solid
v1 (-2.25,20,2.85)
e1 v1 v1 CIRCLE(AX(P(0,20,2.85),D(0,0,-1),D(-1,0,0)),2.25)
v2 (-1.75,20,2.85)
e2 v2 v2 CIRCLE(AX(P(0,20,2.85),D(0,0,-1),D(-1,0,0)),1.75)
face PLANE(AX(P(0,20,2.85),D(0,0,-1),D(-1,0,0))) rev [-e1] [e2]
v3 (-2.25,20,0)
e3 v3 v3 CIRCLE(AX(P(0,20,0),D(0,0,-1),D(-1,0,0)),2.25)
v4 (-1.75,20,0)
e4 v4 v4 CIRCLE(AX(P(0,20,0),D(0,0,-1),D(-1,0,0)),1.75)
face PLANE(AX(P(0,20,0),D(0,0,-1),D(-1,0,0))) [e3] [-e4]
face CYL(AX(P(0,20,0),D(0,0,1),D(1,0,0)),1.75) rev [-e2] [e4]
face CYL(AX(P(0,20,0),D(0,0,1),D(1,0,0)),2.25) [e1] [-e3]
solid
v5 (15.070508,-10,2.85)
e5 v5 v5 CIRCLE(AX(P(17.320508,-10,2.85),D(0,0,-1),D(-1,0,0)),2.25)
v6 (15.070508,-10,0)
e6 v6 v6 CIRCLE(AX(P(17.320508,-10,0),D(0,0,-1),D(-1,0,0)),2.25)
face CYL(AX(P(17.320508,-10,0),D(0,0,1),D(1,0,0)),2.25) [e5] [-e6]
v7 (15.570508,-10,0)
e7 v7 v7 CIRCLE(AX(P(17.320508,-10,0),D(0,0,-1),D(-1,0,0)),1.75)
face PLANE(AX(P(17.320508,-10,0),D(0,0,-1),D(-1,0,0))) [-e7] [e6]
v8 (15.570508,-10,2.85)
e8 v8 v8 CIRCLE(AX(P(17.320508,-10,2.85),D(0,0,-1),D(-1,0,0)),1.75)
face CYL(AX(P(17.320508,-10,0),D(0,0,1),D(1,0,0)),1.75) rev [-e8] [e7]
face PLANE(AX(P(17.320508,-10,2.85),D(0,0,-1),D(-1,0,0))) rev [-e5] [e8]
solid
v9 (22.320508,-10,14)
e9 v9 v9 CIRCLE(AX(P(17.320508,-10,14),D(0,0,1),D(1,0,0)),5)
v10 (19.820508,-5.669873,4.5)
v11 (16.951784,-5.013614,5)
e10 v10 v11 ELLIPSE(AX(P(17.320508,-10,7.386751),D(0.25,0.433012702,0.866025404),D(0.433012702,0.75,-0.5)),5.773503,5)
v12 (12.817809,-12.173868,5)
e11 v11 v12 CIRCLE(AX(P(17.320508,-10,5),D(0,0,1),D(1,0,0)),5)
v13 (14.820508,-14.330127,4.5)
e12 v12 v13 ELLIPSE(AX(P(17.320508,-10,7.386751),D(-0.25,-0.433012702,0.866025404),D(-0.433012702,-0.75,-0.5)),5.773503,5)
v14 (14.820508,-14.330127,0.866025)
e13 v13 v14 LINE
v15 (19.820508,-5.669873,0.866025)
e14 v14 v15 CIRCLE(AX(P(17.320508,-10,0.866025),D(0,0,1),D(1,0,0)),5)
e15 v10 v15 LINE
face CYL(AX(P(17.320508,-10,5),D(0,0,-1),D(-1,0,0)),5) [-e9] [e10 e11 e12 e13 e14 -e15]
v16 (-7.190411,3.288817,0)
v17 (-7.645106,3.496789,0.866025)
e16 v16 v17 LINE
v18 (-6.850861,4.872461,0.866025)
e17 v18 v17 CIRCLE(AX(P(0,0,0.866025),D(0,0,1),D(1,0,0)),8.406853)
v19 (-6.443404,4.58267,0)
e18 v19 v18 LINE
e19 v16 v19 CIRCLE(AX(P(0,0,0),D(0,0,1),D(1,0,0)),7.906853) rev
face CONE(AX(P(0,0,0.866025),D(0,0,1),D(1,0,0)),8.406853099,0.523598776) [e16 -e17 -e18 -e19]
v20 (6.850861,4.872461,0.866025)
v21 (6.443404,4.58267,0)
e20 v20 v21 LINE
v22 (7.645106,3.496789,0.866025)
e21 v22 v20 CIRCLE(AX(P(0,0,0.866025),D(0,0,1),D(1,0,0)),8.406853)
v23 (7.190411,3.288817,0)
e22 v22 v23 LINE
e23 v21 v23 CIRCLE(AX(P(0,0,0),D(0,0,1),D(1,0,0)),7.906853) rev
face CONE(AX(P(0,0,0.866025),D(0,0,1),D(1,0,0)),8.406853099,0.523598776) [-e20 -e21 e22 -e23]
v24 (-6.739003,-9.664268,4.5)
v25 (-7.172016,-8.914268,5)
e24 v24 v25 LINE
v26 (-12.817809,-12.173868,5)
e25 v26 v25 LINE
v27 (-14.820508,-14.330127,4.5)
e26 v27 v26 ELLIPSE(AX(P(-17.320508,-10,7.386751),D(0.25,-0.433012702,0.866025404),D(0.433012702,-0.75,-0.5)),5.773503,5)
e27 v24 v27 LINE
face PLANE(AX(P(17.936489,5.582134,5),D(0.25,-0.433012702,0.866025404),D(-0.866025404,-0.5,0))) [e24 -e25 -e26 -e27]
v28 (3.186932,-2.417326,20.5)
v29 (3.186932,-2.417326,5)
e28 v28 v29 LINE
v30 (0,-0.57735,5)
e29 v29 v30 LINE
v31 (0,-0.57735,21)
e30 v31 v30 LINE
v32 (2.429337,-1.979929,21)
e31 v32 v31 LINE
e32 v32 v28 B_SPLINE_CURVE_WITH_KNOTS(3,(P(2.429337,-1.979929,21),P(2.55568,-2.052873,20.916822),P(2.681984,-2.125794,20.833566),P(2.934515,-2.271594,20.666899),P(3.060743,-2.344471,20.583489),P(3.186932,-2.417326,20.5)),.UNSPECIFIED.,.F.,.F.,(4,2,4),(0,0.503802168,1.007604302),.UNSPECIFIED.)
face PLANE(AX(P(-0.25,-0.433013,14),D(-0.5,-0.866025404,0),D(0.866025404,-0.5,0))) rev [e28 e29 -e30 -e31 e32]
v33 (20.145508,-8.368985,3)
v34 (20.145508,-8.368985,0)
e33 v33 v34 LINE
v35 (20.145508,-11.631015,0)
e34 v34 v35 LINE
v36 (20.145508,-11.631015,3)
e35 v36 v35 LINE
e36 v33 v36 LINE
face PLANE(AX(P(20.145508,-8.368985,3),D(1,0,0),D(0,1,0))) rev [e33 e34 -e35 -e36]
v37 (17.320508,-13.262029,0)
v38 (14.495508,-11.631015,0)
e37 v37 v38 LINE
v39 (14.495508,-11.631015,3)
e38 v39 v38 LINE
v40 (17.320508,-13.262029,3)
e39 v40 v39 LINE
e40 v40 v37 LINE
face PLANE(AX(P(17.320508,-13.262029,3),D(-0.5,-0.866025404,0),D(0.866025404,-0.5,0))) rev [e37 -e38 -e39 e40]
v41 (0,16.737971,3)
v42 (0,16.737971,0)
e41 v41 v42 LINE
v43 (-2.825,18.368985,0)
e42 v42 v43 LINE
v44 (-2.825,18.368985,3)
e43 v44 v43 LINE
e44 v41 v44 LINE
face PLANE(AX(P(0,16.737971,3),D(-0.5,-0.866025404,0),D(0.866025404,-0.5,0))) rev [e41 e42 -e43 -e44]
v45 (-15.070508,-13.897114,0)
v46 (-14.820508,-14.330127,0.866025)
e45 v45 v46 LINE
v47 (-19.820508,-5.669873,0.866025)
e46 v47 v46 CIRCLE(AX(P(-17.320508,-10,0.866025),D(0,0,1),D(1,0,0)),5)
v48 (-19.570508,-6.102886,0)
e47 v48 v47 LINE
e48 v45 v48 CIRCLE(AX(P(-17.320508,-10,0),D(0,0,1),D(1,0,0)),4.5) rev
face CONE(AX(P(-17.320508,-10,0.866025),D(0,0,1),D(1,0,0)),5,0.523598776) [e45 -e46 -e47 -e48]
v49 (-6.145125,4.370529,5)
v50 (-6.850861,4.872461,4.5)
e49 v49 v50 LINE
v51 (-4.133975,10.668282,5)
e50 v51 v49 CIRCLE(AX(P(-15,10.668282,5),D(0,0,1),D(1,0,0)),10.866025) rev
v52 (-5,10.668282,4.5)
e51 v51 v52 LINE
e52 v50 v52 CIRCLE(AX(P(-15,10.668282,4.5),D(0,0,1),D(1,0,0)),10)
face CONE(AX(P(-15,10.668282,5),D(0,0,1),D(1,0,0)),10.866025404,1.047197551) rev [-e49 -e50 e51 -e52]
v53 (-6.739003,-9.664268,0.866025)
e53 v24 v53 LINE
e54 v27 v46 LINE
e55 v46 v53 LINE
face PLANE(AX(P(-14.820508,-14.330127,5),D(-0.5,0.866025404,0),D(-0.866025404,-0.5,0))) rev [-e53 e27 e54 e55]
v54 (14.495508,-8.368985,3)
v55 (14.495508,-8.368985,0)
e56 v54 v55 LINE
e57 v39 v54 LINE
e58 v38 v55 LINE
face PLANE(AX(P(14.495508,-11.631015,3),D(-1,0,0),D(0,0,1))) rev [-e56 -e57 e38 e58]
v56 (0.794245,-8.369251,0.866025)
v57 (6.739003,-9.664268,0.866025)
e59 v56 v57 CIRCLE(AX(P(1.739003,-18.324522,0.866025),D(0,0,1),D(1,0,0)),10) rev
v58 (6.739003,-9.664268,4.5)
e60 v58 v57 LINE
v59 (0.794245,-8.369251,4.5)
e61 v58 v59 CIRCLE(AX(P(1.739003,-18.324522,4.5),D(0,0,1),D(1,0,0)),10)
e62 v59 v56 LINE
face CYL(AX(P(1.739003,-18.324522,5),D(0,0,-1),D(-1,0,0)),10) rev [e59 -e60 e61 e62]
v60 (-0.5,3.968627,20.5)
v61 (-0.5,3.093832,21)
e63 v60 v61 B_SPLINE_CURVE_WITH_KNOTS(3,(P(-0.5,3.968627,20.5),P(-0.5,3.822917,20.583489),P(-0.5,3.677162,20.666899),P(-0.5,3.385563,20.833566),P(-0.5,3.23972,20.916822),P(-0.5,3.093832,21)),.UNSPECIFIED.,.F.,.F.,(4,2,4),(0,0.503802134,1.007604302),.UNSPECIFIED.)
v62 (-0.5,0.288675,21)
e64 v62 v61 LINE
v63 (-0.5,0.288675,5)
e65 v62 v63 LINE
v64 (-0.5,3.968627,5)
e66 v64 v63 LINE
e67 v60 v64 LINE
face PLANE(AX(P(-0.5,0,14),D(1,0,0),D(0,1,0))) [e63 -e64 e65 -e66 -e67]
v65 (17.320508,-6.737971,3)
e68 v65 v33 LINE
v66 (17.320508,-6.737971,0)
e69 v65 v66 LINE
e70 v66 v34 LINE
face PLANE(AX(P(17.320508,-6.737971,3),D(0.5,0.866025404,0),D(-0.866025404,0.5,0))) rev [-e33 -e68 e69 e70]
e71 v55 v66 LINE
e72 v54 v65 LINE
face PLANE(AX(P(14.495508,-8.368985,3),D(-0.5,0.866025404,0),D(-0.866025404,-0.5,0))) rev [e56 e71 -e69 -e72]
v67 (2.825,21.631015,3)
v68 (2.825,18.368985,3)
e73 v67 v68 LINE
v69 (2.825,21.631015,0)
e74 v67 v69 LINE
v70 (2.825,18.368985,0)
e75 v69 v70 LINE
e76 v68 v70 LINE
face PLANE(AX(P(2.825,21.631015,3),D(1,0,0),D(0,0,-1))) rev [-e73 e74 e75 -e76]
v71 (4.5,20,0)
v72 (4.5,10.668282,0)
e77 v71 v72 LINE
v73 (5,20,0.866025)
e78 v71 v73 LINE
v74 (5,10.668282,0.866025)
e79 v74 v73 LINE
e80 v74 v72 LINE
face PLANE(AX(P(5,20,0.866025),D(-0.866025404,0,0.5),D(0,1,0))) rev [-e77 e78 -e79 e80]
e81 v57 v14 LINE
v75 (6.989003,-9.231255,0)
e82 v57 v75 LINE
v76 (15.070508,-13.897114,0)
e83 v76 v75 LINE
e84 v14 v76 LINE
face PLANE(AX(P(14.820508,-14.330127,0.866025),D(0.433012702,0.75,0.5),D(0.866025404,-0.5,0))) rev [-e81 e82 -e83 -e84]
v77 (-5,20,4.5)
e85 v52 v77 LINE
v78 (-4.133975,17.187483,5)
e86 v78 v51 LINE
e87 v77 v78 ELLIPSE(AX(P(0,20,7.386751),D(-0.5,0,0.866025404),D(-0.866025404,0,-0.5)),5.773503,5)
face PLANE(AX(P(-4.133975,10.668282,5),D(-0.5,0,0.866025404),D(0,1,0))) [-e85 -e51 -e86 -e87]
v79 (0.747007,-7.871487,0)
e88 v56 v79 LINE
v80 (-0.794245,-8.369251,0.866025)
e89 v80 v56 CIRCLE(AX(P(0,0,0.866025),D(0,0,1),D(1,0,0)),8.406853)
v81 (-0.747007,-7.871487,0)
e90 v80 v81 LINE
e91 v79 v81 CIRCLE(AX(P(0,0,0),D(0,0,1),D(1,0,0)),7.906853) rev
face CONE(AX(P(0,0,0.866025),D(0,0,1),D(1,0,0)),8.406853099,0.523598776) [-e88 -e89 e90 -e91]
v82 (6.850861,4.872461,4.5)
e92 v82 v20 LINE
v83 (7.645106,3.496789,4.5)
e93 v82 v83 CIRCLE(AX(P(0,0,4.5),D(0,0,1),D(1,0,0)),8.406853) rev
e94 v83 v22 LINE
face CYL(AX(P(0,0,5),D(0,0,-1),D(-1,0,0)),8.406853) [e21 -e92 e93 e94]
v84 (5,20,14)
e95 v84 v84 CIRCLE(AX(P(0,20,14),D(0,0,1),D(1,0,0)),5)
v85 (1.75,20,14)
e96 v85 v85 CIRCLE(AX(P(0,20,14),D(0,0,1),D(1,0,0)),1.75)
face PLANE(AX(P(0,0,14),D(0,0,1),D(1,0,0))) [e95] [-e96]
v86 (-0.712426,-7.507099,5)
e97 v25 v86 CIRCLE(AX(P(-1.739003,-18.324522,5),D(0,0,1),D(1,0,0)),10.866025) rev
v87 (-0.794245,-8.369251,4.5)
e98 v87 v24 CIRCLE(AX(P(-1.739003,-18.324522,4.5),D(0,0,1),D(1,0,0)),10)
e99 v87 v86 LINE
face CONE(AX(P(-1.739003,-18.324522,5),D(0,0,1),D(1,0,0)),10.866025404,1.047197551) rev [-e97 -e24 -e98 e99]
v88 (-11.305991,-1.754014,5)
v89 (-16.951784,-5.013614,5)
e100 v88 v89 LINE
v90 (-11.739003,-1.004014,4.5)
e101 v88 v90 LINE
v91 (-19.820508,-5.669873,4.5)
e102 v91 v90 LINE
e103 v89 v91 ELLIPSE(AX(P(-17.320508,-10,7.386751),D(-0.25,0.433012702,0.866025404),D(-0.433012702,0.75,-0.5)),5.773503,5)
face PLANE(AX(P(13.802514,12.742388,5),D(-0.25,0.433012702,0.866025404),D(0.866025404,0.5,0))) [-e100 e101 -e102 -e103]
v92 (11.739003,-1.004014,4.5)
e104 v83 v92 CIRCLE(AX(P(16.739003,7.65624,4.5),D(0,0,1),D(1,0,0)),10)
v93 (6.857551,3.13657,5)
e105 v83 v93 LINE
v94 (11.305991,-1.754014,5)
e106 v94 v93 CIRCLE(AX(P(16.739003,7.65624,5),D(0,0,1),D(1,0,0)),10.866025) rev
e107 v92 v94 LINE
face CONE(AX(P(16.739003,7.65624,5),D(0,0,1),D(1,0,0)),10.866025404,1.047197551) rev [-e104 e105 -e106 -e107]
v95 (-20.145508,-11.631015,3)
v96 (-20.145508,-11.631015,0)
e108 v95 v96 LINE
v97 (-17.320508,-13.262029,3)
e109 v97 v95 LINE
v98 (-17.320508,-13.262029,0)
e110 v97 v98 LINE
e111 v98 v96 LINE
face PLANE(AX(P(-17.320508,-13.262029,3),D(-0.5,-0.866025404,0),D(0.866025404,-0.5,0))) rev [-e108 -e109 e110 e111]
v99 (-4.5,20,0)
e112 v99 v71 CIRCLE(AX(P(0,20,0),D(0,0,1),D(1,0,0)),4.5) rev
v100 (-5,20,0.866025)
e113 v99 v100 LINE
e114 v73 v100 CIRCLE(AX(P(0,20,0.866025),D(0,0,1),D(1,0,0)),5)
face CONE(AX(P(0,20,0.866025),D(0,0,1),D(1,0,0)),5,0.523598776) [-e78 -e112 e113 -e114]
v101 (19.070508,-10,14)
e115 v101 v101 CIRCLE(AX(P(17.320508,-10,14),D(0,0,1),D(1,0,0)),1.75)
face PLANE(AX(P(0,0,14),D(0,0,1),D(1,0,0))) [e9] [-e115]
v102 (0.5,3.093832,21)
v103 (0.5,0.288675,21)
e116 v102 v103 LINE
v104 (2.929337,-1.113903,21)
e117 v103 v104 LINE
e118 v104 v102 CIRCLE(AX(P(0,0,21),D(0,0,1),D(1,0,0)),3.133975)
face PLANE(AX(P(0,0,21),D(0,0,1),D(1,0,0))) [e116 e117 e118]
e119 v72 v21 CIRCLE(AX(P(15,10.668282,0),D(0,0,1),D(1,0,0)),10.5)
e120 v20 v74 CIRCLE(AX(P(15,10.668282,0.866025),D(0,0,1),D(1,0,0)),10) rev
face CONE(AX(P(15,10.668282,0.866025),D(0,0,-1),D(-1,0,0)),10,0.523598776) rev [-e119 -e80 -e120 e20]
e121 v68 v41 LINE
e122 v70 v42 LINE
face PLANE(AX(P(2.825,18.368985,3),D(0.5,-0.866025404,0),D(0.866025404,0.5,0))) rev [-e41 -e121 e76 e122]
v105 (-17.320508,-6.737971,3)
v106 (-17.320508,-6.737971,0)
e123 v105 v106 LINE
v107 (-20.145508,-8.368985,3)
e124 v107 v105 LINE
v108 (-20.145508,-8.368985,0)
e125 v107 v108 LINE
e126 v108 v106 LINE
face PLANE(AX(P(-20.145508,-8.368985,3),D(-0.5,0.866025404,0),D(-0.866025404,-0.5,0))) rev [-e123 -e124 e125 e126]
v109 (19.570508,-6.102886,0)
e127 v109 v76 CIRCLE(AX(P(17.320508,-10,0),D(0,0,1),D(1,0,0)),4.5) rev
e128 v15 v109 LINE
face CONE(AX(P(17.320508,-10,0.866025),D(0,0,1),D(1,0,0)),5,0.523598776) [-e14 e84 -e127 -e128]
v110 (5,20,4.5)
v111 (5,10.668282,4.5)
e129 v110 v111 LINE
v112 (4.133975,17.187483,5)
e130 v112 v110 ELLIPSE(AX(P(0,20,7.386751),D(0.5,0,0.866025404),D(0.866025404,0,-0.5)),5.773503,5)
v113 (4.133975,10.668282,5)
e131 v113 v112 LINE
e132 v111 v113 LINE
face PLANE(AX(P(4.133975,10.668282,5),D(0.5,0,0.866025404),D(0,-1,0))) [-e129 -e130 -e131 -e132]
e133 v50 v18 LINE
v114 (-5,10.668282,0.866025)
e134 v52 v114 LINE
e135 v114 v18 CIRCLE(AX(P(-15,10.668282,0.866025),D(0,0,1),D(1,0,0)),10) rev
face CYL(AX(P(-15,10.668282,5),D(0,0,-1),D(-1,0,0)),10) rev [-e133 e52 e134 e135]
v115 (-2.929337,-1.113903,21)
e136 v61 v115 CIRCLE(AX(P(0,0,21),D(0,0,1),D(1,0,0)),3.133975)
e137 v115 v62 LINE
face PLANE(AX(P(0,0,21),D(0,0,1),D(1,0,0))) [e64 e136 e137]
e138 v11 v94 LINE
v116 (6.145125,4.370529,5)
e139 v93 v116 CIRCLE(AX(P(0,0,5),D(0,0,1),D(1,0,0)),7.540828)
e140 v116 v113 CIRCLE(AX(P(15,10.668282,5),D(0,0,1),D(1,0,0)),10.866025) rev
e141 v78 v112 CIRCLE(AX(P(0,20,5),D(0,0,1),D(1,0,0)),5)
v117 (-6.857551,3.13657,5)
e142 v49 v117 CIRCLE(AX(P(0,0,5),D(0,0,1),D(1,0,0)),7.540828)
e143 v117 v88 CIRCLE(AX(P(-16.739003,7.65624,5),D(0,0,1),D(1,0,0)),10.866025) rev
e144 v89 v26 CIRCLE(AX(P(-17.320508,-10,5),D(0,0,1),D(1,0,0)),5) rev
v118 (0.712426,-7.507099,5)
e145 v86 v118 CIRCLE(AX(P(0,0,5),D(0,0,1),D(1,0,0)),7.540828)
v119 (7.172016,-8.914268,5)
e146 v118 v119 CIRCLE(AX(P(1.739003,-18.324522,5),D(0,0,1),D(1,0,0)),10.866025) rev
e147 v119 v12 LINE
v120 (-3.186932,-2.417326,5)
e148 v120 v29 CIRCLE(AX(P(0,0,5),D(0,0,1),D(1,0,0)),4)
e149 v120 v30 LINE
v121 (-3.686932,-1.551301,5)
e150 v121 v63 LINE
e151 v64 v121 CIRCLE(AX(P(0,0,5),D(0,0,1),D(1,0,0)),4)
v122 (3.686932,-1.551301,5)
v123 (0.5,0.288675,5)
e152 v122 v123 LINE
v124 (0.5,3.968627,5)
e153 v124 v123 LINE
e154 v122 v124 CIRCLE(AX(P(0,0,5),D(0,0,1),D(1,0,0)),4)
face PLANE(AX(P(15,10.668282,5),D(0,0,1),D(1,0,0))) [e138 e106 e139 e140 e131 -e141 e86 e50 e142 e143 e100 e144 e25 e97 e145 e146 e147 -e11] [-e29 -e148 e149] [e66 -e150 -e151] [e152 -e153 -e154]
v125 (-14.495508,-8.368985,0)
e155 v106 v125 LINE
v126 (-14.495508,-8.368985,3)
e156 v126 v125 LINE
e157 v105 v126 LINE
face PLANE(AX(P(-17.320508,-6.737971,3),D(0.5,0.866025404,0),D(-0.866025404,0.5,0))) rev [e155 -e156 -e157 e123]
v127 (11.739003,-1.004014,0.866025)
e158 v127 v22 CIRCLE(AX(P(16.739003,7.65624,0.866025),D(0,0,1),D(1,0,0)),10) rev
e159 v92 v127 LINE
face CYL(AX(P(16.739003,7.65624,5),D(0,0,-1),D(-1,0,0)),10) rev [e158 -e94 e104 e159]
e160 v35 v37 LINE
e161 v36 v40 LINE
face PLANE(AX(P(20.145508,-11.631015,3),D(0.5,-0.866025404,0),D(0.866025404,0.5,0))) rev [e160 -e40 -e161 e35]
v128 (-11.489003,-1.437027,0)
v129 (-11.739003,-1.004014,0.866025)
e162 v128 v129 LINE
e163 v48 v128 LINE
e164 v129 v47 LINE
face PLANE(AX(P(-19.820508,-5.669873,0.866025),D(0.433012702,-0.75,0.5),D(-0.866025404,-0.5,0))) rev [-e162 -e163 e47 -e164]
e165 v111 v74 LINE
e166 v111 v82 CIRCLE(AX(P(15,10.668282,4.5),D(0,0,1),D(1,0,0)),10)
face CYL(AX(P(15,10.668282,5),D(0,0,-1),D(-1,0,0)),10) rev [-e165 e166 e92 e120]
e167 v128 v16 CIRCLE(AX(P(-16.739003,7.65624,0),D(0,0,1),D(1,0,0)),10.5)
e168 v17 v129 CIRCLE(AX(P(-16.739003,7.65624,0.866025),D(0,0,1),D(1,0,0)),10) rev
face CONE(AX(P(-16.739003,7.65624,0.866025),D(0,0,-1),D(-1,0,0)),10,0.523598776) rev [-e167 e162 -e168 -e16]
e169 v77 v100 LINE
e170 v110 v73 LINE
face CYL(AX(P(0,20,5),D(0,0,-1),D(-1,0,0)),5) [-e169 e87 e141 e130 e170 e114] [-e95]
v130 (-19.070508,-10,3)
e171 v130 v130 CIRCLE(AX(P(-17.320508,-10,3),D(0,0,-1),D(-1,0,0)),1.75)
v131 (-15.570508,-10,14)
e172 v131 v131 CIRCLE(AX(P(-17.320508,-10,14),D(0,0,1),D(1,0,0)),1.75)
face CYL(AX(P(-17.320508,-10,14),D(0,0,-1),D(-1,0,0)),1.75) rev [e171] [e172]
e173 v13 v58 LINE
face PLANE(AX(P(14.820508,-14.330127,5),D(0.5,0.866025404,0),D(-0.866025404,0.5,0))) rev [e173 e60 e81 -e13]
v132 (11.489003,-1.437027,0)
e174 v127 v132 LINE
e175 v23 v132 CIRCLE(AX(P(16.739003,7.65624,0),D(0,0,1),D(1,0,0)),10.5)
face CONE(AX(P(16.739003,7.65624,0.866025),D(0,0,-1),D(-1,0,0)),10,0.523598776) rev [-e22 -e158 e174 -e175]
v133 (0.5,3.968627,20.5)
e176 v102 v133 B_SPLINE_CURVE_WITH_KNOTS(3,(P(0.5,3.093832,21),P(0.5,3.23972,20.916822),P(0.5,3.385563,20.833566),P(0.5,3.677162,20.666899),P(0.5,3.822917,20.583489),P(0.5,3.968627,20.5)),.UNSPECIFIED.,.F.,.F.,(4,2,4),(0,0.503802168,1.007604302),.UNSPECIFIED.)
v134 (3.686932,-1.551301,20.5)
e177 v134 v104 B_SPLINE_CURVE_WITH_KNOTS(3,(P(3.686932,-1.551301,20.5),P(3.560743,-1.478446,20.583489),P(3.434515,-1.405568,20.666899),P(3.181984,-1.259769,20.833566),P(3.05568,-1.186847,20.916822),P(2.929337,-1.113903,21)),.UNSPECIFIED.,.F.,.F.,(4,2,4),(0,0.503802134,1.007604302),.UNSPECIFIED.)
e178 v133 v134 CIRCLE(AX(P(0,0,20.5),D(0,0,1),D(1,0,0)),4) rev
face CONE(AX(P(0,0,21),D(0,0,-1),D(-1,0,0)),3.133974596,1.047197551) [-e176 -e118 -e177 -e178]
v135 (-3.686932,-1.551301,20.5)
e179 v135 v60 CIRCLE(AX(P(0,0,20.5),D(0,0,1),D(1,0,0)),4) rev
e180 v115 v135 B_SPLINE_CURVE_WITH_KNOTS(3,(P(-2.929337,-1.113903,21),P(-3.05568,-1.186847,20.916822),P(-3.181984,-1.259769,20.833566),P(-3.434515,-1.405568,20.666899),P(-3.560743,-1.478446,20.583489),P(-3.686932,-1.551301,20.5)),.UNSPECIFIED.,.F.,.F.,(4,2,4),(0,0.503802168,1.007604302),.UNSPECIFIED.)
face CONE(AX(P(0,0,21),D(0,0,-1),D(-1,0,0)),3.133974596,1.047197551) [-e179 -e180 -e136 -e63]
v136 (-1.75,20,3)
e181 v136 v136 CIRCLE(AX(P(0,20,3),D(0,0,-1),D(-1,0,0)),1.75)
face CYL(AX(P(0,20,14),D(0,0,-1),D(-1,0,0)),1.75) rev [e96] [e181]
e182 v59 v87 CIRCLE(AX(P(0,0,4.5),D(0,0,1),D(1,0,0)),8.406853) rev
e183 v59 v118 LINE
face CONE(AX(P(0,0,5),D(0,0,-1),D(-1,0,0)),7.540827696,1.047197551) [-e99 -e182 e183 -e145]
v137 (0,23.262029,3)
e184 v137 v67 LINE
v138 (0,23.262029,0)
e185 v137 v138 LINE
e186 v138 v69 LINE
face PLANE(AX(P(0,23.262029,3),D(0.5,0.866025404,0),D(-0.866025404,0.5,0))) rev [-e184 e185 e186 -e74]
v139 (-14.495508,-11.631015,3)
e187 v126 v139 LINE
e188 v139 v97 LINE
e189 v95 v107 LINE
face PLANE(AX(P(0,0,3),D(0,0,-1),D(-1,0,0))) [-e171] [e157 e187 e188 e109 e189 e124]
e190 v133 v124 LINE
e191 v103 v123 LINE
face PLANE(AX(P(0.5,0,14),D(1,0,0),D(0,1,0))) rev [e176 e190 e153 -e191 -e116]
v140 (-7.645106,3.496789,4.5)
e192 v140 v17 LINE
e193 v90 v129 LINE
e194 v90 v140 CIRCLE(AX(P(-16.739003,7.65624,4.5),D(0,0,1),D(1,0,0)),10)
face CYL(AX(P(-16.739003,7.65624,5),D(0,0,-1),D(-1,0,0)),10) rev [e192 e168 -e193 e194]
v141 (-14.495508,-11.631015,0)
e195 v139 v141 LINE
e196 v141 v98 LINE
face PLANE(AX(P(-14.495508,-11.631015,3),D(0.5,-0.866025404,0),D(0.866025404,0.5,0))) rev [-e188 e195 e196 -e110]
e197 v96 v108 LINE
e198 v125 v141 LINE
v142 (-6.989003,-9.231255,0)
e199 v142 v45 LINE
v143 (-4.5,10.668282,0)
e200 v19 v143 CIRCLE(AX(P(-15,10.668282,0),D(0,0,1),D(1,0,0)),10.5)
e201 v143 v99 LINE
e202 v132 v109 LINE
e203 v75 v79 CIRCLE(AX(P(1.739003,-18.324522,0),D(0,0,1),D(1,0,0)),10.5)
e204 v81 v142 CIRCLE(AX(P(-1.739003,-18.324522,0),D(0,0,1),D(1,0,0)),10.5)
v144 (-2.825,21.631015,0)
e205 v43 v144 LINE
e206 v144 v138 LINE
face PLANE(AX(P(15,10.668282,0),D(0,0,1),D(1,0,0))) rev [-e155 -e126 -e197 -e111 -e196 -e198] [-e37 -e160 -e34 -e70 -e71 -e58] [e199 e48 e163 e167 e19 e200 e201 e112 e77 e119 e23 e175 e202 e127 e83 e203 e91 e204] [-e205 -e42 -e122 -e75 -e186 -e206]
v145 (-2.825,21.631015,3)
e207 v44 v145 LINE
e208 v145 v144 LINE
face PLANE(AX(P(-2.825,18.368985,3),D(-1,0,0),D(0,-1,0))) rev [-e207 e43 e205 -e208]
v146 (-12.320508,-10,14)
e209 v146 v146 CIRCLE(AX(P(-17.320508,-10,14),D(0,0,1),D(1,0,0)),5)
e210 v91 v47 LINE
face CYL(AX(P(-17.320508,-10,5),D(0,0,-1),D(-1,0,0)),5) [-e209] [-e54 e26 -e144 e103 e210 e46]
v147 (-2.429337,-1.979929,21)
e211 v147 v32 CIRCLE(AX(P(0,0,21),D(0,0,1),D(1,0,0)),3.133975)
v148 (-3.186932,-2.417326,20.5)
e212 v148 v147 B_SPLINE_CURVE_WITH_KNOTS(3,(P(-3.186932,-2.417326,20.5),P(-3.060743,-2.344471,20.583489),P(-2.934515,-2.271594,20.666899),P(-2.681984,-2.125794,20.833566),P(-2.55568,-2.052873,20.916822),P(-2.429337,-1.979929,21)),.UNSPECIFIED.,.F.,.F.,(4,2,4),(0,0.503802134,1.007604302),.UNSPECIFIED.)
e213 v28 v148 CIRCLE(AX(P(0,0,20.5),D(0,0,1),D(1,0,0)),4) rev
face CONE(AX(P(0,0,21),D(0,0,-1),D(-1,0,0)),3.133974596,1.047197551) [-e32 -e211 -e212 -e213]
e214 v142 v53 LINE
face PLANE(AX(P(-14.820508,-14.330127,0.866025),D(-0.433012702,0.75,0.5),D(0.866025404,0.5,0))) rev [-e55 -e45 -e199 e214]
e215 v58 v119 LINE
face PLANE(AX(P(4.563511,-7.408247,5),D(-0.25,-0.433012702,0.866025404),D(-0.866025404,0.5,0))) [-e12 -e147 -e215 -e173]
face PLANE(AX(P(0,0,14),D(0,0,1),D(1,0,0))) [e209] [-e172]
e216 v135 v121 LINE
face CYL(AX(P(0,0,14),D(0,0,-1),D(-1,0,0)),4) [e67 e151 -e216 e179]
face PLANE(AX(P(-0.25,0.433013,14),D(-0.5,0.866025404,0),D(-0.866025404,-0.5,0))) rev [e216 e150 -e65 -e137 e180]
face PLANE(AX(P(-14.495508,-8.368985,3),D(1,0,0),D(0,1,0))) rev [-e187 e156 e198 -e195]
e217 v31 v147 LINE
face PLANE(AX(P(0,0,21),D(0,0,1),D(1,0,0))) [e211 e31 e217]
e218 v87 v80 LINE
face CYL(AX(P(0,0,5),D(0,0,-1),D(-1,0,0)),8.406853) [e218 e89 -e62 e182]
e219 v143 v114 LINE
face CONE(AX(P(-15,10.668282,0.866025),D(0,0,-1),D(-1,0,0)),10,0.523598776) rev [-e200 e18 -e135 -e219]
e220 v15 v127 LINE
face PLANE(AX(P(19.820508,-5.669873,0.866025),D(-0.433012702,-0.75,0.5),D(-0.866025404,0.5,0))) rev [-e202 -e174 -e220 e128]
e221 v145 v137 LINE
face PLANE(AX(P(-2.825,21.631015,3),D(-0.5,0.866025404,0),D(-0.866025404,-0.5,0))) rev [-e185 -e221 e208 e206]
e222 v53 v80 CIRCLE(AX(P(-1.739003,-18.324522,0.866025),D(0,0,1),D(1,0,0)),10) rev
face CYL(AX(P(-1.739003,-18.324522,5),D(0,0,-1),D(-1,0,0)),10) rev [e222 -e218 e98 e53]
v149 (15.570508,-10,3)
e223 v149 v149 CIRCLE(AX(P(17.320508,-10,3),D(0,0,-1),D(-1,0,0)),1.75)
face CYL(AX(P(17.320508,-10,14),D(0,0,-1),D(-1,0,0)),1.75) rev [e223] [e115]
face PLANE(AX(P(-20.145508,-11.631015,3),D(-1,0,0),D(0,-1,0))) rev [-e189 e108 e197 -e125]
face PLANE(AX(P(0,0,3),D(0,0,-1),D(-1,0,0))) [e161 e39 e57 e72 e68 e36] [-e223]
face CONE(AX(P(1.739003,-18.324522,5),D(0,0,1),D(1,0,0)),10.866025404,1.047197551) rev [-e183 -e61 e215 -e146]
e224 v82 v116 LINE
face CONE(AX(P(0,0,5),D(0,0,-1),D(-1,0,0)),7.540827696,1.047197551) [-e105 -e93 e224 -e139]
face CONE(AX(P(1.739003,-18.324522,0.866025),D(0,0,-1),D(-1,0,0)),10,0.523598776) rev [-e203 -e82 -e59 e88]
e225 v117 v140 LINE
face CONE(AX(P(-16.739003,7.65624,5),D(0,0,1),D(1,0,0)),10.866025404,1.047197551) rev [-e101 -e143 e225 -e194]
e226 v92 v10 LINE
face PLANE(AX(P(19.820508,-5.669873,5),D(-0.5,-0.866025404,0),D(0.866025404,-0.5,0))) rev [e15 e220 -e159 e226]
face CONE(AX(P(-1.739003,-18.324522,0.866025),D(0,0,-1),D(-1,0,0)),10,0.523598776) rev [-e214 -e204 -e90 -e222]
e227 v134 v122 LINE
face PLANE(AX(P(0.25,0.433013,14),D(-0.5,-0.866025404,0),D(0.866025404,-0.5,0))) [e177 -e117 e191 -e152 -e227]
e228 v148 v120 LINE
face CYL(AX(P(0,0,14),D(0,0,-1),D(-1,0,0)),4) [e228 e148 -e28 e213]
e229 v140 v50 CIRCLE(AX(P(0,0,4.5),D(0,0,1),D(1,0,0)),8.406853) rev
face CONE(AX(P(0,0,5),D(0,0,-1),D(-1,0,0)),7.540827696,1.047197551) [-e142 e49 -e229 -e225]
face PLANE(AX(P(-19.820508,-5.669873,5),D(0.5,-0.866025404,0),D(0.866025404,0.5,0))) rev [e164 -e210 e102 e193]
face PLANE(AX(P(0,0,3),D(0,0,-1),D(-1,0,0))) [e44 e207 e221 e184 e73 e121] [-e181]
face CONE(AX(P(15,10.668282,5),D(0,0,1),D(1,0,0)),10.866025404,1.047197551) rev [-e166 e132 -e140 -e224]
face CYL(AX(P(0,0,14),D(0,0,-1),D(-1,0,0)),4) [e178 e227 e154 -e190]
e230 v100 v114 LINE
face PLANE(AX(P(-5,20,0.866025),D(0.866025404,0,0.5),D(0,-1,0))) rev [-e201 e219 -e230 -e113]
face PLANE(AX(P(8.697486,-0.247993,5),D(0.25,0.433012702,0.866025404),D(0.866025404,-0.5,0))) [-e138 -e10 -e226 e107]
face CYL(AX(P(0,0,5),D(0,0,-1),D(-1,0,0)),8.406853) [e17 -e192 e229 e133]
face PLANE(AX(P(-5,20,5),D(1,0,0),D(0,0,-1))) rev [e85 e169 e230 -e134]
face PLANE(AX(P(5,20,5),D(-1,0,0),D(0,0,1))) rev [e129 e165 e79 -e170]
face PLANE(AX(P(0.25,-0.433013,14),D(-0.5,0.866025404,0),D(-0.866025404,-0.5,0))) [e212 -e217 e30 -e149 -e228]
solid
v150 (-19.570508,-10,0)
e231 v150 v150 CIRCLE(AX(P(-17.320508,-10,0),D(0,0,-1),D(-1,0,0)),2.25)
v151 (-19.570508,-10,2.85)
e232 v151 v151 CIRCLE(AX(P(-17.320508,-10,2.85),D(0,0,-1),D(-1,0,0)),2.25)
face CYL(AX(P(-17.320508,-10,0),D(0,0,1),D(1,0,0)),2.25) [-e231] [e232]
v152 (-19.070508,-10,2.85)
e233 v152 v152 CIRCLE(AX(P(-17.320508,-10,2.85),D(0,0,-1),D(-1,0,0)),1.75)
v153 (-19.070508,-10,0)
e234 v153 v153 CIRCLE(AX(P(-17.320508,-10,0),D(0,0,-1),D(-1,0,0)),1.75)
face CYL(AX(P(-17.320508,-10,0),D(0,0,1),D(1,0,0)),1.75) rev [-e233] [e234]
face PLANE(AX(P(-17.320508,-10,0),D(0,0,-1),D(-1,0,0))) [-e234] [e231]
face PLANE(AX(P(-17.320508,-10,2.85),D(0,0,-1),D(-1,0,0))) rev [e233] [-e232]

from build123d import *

# Parameters (mm, degrees)
BOSS_EXTRUDE1_DEPTH   = 5
SKETCH2_R             = 5
SKETCH2_R_2           = 1.75
BOSS_EXTRUDE2_DEPTH   = 9
BOSS_EXTRUDE3_DEPTH   = 7
SKETCH4_R             = 1.75
CUT_EXTRUDE1_DEPTH    = 38.137650447
CUT_EXTRUDE3_DEPTH    = 3
CHAMFER1_SIZE         = 0.5
CHAMFER1_SIZE2        = 0.866025404
CHAMFER2_SIZE         = 0.5
CHAMFER2_SIZE_2       = 0.866025404
BOSS_EXTRUDE5_START   = 0.15
SKETCH8_R             = 2.25
SKETCH8_R_2           = 1.75
BOSS_EXTRUDE5_DEPTH   = 2.85
BOSS_EXTRUDE5_2_DEPTH = 2.85
BOSS_EXTRUDE5_3_DEPTH = 2.85


with BuildPart() as part:
    # Sketch1 → Boss-Extrude1 (new body)
    with BuildSketch(Plane.XY):
        with BuildLine():
            Line((-5, 20), (-5, 10.668282009))
            ThreePointArc((-5, 10.668282009), (-5.473946579, 7.626192889), (-6.850861242, 4.872461316))
            ThreePointArc((-6.850861242, 4.872461316), (-7.28054835, 4.20342655), (-7.6451059, 3.496789216))
            ThreePointArc((-7.6451059, 3.496789216), (-9.341450066, 0.927480351), (-11.739003235, -1.004013986))
            Line((-11.739003235, -1.004013986), (-19.820508076, -5.669872981))
            ThreePointArc((-19.820508076, -5.669872981), (-21.650635095, -12.5), (-14.820508076, -14.330127019))
            Line((-14.820508076, -14.330127019), (-6.739003235, -9.664268023))
            ThreePointArc((-6.739003235, -9.664268023), (-3.867503487, -8.553673241), (-0.794244657, -8.369250532))
            ThreePointArc((-0.794244657, -8.369250532), (0, -8.406853099), (0.794244657, -8.369250532))
            ThreePointArc((0.794244657, -8.369250532), (3.867503487, -8.553673241), (6.739003235, -9.664268023))
            Line((6.739003235, -9.664268023), (14.820508076, -14.330127019))
            ThreePointArc((14.820508076, -14.330127019), (21.650635095, -12.5), (19.820508076, -5.669872981))
            Line((19.820508076, -5.669872981), (11.739003235, -1.004013986))
            ThreePointArc((11.739003235, -1.004013986), (9.341450066, 0.927480351), (7.6451059, 3.496789216))
            ThreePointArc((7.6451059, 3.496789216), (7.28054835, 4.20342655), (6.850861242, 4.872461316))
            ThreePointArc((6.850861242, 4.872461316), (5.473946579, 7.626192889), (5, 10.668282009))
            Line((5, 10.668282009), (5, 20))
            ThreePointArc((5, 20), (0, 25), (-5, 20))
        make_face()
    extrude(amount=BOSS_EXTRUDE1_DEPTH)

    # Sketch2 → Boss-Extrude2 (add)
    # profile 1 of 6: a face of its own
    with BuildSketch(Plane.XY.offset(5)):
        with Locations(Location((17.320508076, -10, 0), (0, 0, 240))):
            Circle(SKETCH2_R)
        with Locations((17.320508076, -10)):
            Circle(SKETCH2_R_2, mode=Mode.SUBTRACT)
    # profile 2 of 6: a face of its own
    with BuildSketch(Plane.XY.offset(5)):
        with Locations(Location((-17.320508076, -10, 0), (0, 0, 120))):
            Circle(SKETCH2_R)
        with Locations((-17.320508076, -10)):
            Circle(SKETCH2_R_2, mode=Mode.SUBTRACT)
    # profile 3 of 6: a face of its own
    with BuildSketch(Plane.XY.offset(5)):
        with Locations((0, 20)):
            Circle(SKETCH2_R)
        with Locations((0, 20)):
            Circle(SKETCH2_R_2, mode=Mode.SUBTRACT)
    # profile 4 of 6: a face of its own
    with BuildSketch(Plane.XY.offset(5)):
        with BuildLine():
            ThreePointArc((3.686931771, -1.551300781), (3.464101615, 2), (0.5, 3.968626967))
            Line((0.5, 3.968626967), (0.5, 0.288675135))
            Line((0.5, 0.288675135), (3.686931771, -1.551300781))
        make_face()
    # profile 5 of 6: a face of its own
    with BuildSketch(Plane.XY.offset(5)):
        with BuildLine():
            Line((-0.5, 0.288675135), (-0.5, 3.968626967))
            ThreePointArc((-0.5, 3.968626967), (-3.464101615, 2), (-3.686931771, -1.551300781))
            Line((-3.686931771, -1.551300781), (-0.5, 0.288675135))
        make_face()
    # profile 6 of 6: a face of its own
    with BuildSketch(Plane.XY.offset(5)):
        with BuildLine():
            ThreePointArc((-3.186931771, -2.417326185), (0, -4), (3.186931771, -2.417326185))
            Line((3.186931771, -2.417326185), (0, -0.577350269))
            Line((0, -0.577350269), (-3.186931771, -2.417326185))
        make_face()
    extrude(amount=BOSS_EXTRUDE2_DEPTH)

    # Sketch3 → Boss-Extrude3 (add)
    with BuildSketch(Plane.XY.offset(14)):
        with BuildLine():
            Line((-0.5, 0.288675135), (-0.5, 3.968626967))
            ThreePointArc((-0.5, 3.968626967), (-3.464101615, 2), (-3.686931771, -1.551300781))
            Line((-3.686931771, -1.551300781), (-0.5, 0.288675135))
        make_face()
        with BuildLine():
            Line((0.5, 0.288675135), (3.686931771, -1.551300781))
            ThreePointArc((3.686931771, -1.551300781), (3.464101615, 2), (0.5, 3.968626967))
            Line((0.5, 3.968626967), (0.5, 0.288675135))
        make_face()
        with BuildLine():
            Line((0, -0.577350269), (-3.186931771, -2.417326185))
            ThreePointArc((-3.186931771, -2.417326185), (0, -4), (3.186931771, -2.417326185))
            Line((3.186931771, -2.417326185), (0, -0.577350269))
        make_face()
    extrude(amount=BOSS_EXTRUDE3_DEPTH)

    # Sketch4 → Cut-Extrude1 (cut, through all)
    with BuildSketch(Plane.XY.offset(5)):
        with Locations((17.320508076, -10)):
            Circle(SKETCH4_R)
        with Locations((0, 20)):
            Circle(SKETCH4_R)
        with Locations((-17.320508076, -10)):
            Circle(SKETCH4_R)
    extrude(amount=-CUT_EXTRUDE1_DEPTH, mode=Mode.SUBTRACT)

    # Sketch7 → Cut-Extrude3 (cut)
    with BuildSketch(Plane(origin=(0, 0, 0), x_dir=(-1, 0, 0), z_dir=(0, 0, -1))):
        Polygon((14.495508076, -8.36898549), (14.495508076, -11.63101451), (17.320508076, -13.262029021), (20.145508076, -11.63101451), (20.145508076, -8.36898549), (17.320508076, -6.737970979), align=None)
        Polygon((0, 16.737970979), (2.825, 18.36898549), (2.825, 21.63101451), (0, 23.262029021), (-2.825, 21.63101451), (-2.825, 18.36898549), align=None)
        Polygon((-14.495508076, -8.36898549), (-17.320508076, -6.737970979), (-20.145508076, -8.36898549), (-20.145508076, -11.63101451), (-17.320508076, -13.262029021), (-14.495508076, -11.63101451), align=None)
    extrude(amount=-CUT_EXTRUDE3_DEPTH, mode=Mode.SUBTRACT)

    # Chamfer1
    chamfer1_edges = [part.edges().sort_by_distance(p)[0] for p in [
        (7.28054835, 4.20342655, 0),
        (9.341450066, 0.927480351, 0),
        (15.779755655, -3.336943483, 0),
        (21.650635095, -12.5, 0),
        (10.779755655, -11.997197521, 0),
        (3.867503487, -8.553673241, 0),
        (0, -8.406853099, 0),
        (-3.867503487, -8.553673241, 0),
        (-10.779755655, -11.997197521, 0),
        (-21.650635095, -12.5, 0),
        (-15.779755655, -3.336943483, 0),
        (-9.341450066, 0.927480351, 0),
        (-7.28054835, 4.20342655, 0),
        (-5.473946579, 7.626192889, 0),
        (-5, 15.334141004, 0),
        (0, 25, 0),
        (5, 15.334141004, 0),
        (5.473946579, 7.626192889, 0),
    ]]
    chamfer1_side = [part.faces().sort_by_distance(p)[0] for p in [
        (0, 0, 0),
    ]]
    chamfer(chamfer1_edges, length=CHAMFER1_SIZE, length2=CHAMFER1_SIZE2, reference=chamfer1_side[0])

    # Chamfer2
    # the kernel refuses this chamfer: 0.866025404, 0.5 mm, written as the material it takes off along each edge
    with BuildSketch(Plane(origin=(0, 0, 21), x_dir=(0.421503526327494, 0.9068267625591382, 0), z_dir=(0.9068267625591382, -0.421503526327494, 0))) as chamfer2_piece_1:
        Polygon((4, -CHAMFER2_SIZE), (4 - CHAMFER2_SIZE_2, 0), (4, 0), align=None)
    revolve(axis=Axis((0, 0, 21), (0, 0, 1)), revolution_arc=169.859095672, mode=Mode.SUBTRACT)
    with BuildSketch(Plane(origin=(0, 0, 21), x_dir=(0.574583250044062, -0.8184461428639046, 0), z_dir=(-0.8184461428639046, -0.574583250044062, 0))) as chamfer2_piece_2:
        Polygon((4, -CHAMFER2_SIZE), (4 - CHAMFER2_SIZE_2, 0), (4, 0), align=None)
    revolve(axis=Axis((0, 0, 21), (0, 0, 1)), revolution_arc=169.859095672, mode=Mode.SUBTRACT)
    with BuildSketch(Plane(origin=(0, 0, 21), x_dir=(-0.9960867763715608, -0.08838061969522747, 0), z_dir=(-0.08838061969522747, 0.9960867763715608, 0))) as chamfer2_piece_3:
        Polygon((4, -CHAMFER2_SIZE), (4 - CHAMFER2_SIZE_2, 0), (4, 0), align=None)
    revolve(axis=Axis((0, 0, 21), (0, 0, 1)), revolution_arc=169.859095672, mode=Mode.SUBTRACT)
    with BuildSketch(Plane(origin=(-5, 22.240481985, 5), x_dir=(0.9998132206222079, 0, 0.019326765612700702), z_dir=(0, -1, 0))) as chamfer2_piece_4_section:
        Polygon((CHAMFER2_SIZE_2 * 0.999813220373, -CHAMFER2_SIZE_2 * 0.0193267656079), (-CHAMFER2_SIZE * 0.0193267656127, -CHAMFER2_SIZE * 0.999813220622), (0, 0), align=None)
    chamfer2_piece_4 = extrude(amount=11.572199976, mode=Mode.PRIVATE)
    chamfer2_piece_4 = chamfer2_piece_4 - Plane(origin=(0, 20, 4.828748489), x_dir=(1, 0, 0), z_dir=(0, 0, -1)) * Cylinder(5, 27, mode=Mode.PRIVATE)
    add(chamfer2_piece_4, mode=Mode.SUBTRACT)
    with BuildSketch(Plane(origin=(-15, 10.668282009, 5), x_dir=(1, 0, 0), z_dir=(0, 1, 0))) as chamfer2_piece_5:
        Polygon((10 + CHAMFER2_SIZE_2, 0), (10, CHAMFER2_SIZE), (10, 0), align=None)
    revolve(axis=Axis((-15, 10.668282009, 5), (0, 0, -1)), revolution_arc=35.421152989, mode=Mode.SUBTRACT)
    with BuildSketch(Plane(origin=(0, 0, 5), x_dir=(-0.8149138757719532, 0.5795820693174815, 0), z_dir=(0.5795820693174815, 0.8149138757719532, 0))) as chamfer2_piece_6:
        Polygon((8.406853099 - CHAMFER2_SIZE_2, 0), (8.406853099, -CHAMFER2_SIZE), (8.406853099, 0), align=None)
    revolve(axis=Axis((0, 0, 5), (0, 0, 1)), revolution_arc=10.842305977, mode=Mode.SUBTRACT)
    with BuildSketch(Plane(origin=(-16.739003235, 7.656240052, 5), x_dir=(0.9093897334928682, -0.41594508365620836, 0), z_dir=(0.41594508365620836, 0.9093897334928682, 0))) as chamfer2_piece_7:
        Polygon((10 + CHAMFER2_SIZE_2, 0), (10, CHAMFER2_SIZE), (10, 0), align=None)
    revolve(axis=Axis((-16.739003235, 7.656240052, 5), (0, 0, -1)), revolution_arc=35.421152989, mode=Mode.SUBTRACT)
    with BuildSketch(Plane(origin=(-11.739003235, -1.004013986, 5), x_dir=(0.4999066103111042, -0.8658636480983676, 0.01932676561270069), z_dir=(-0.8660254037844386, -0.5000000000000003, 0))) as chamfer2_piece_8_section:
        Polygon((CHAMFER2_SIZE_2 * 0.999813220373, -CHAMFER2_SIZE_2 * 0.0193267656079), (-CHAMFER2_SIZE * 0.0193267656127, -CHAMFER2_SIZE * 0.999813220622), (0, 0), align=None)
    chamfer2_piece_8 = extrude(amount=11.572199976, mode=Mode.PRIVATE)
    chamfer2_piece_8 = chamfer2_piece_8 - Plane(origin=(-17.320508076, -10, 4.82874849), x_dir=(-0.49999999999999634, 0.8660254037844408, 0), z_dir=(0, 0, -1)) * Cylinder(5, 27, mode=Mode.PRIVATE)
    add(chamfer2_piece_8, mode=Mode.SUBTRACT)
    with BuildSketch(Plane(origin=(-16.760822392, -15.450368012, 5), x_dir=(-0.4999066103111033, 0.8658636480983681, 0.019326765612700702), z_dir=(0.8660254037844392, 0.49999999999999933, 0))) as chamfer2_piece_9_section:
        Polygon((CHAMFER2_SIZE_2 * 0.999813220373, -CHAMFER2_SIZE_2 * 0.0193267656079), (-CHAMFER2_SIZE * 0.0193267656127, -CHAMFER2_SIZE * 0.999813220622), (0, 0), align=None)
    chamfer2_piece_9 = extrude(amount=11.572199976, mode=Mode.PRIVATE)
    chamfer2_piece_9 = chamfer2_piece_9 - Plane(origin=(-17.320508076, -10, 4.828748489), x_dir=(-0.49999999999999634, 0.8660254037844408, 0), z_dir=(0, 0, -1)) * Cylinder(5, 27, mode=Mode.PRIVATE)
    add(chamfer2_piece_9, mode=Mode.SUBTRACT)
    with BuildSketch(Plane(origin=(-1.739003235, -18.324522061, 5), x_dir=(-0.5000000000000002, 0.8660254037844386, 0), z_dir=(-0.8660254037844386, -0.5000000000000002, 0))) as chamfer2_piece_10:
        Polygon((10 + CHAMFER2_SIZE_2, 0), (10, CHAMFER2_SIZE), (10, 0), align=None)
    revolve(axis=Axis((-1.739003235, -18.324522061, 5), (0, 0, -1)), revolution_arc=35.421152989, mode=Mode.SUBTRACT)
    with BuildSketch(Plane(origin=(0, 0, 5), x_dir=(-0.09447585772091267, -0.9955271529736884, 0), z_dir=(-0.9955271529736884, 0.09447585772091267, 0))) as chamfer2_piece_11:
        Polygon((8.406853099 - CHAMFER2_SIZE_2, 0), (8.406853099, -CHAMFER2_SIZE), (8.406853099, 0), align=None)
    revolve(axis=Axis((0, 0, 5), (0, 0, 1)), revolution_arc=10.842305977, mode=Mode.SUBTRACT)
    with BuildSketch(Plane(origin=(15, 10.668282009, 5), x_dir=(-0.814913875771955, -0.579582069317479, 0), z_dir=(0.579582069317479, -0.814913875771955, 0))) as chamfer2_piece_12:
        Polygon((10, CHAMFER2_SIZE), (10 + CHAMFER2_SIZE_2, 0), (10, 0), align=None)
    revolve(axis=Axis((15, 10.668282009, 5), (0, 0, -1)), revolution_arc=35.421152989, mode=Mode.SUBTRACT)
    with BuildSketch(Plane(origin=(1.739003235, -18.324522061, 5), x_dir=(-0.09447585772091491, 0.9955271529736883, 0), z_dir=(-0.9955271529736883, -0.09447585772091491, 0))) as chamfer2_piece_13:
        Polygon((10 + CHAMFER2_SIZE_2, 0), (10, CHAMFER2_SIZE), (10, 0), align=None)
    revolve(axis=Axis((1.739003235, -18.324522061, 5), (0, 0, -1)), revolution_arc=35.421152989, mode=Mode.SUBTRACT)
    with BuildSketch(Plane(origin=(6.739003235, -9.664268023, 5), x_dir=(0.4999066103111033, 0.865863648098368, 0.019326765612700712), z_dir=(0.866025403784439, -0.49999999999999933, 0))) as chamfer2_piece_14_section:
        Polygon((CHAMFER2_SIZE_2 * 0.999813220373, -CHAMFER2_SIZE_2 * 0.0193267656079), (-CHAMFER2_SIZE * 0.0193267656127, -CHAMFER2_SIZE * 0.999813220622), (0, 0), align=None)
    chamfer2_piece_14 = extrude(amount=11.572199976, mode=Mode.PRIVATE)
    chamfer2_piece_14 = chamfer2_piece_14 - Plane(origin=(17.320508076, -10, 4.82874849), x_dir=(-0.5000000000000019, -0.8660254037844376, 0), z_dir=(0, 0, -1)) * Cylinder(5, 27, mode=Mode.PRIVATE)
    add(chamfer2_piece_14, mode=Mode.SUBTRACT)
    with BuildSketch(Plane(origin=(21.760822392, -6.790113974, 5), x_dir=(-0.499906610311104, -0.8658636480983676, 0.01932676561270072), z_dir=(-0.8660254037844387, 0.5000000000000001, 0))) as chamfer2_piece_15_section:
        Polygon((CHAMFER2_SIZE_2 * 0.999813220373, -CHAMFER2_SIZE_2 * 0.0193267656079), (-CHAMFER2_SIZE * 0.0193267656127, -CHAMFER2_SIZE * 0.999813220622), (0, 0), align=None)
    chamfer2_piece_15 = extrude(amount=11.572199976, mode=Mode.PRIVATE)
    chamfer2_piece_15 = chamfer2_piece_15 - Plane(origin=(17.320508076, -10, 4.828748489), x_dir=(-0.5000000000000019, -0.8660254037844376, 0), z_dir=(0, 0, -1)) * Cylinder(5, 27, mode=Mode.PRIVATE)
    add(chamfer2_piece_15, mode=Mode.SUBTRACT)
    with BuildSketch(Plane(origin=(16.739003235, 7.656240052, 5), x_dir=(-0.5000000000000013, -0.8660254037844379, 0), z_dir=(0.8660254037844379, -0.5000000000000013, 0))) as chamfer2_piece_16:
        Polygon((10 + CHAMFER2_SIZE_2, 0), (10, CHAMFER2_SIZE), (10, 0), align=None)
    revolve(axis=Axis((16.739003235, 7.656240052, 5), (0, 0, -1)), revolution_arc=35.421152989, mode=Mode.SUBTRACT)
    with BuildSketch(Plane(origin=(0, 0, 5), x_dir=(0.9093897334928667, 0.41594508365621186, 0), z_dir=(0.41594508365621186, -0.9093897334928667, 0))) as chamfer2_piece_17:
        Polygon((8.406853099 - CHAMFER2_SIZE_2, 0), (8.406853099, -CHAMFER2_SIZE), (8.406853099, 0), align=None)
    revolve(axis=Axis((0, 0, 5), (0, 0, 1)), revolution_arc=10.842305977, mode=Mode.SUBTRACT)
    with BuildSketch(Plane(origin=(5, 10.668282009, 5), x_dir=(0.05789386240267147, 0, -0.9983227437537926), z_dir=(0, 1, 0))) as chamfer2_piece_18_section:
        Polygon((CHAMFER2_SIZE * 0.998322743754, CHAMFER2_SIZE * 0.0578938624027), (-CHAMFER2_SIZE_2 * 0.0578938623883, CHAMFER2_SIZE_2 * 0.998322743505), (0, 0), align=None)
    chamfer2_piece_18 = extrude(amount=11.572199976, mode=Mode.PRIVATE)
    chamfer2_piece_18 = chamfer2_piece_18 - Plane(origin=(0, 20, 4.82874849), x_dir=(1, 0, 0), z_dir=(0, 0, -1)) * Cylinder(5, 27, mode=Mode.PRIVATE)
    add(chamfer2_piece_18, mode=Mode.SUBTRACT)


with BuildPart() as body_2:
    # Sketch8 → Boss-Extrude5 (new body)
    with BuildSketch(Plane(origin=(0, 0, 3), x_dir=(-1, 0, 0), z_dir=(0, 0, -1)).offset(BOSS_EXTRUDE5_START)):
        with Locations((17.320508076, -10)):
            Circle(SKETCH8_R)
        with Locations((17.320508076, -10)):
            Circle(SKETCH8_R_2, mode=Mode.SUBTRACT)
    extrude(amount=BOSS_EXTRUDE5_DEPTH)


with BuildPart() as body_3:
    # Sketch8 → Boss-Extrude5 2 (new body)
    with BuildSketch(Plane(origin=(0, 0, 3), x_dir=(-1, 0, 0), z_dir=(0, 0, -1)).offset(BOSS_EXTRUDE5_START)):
        with Locations((-17.320508076, -10)):
            Circle(SKETCH8_R)
        with Locations((-17.320508076, -10)):
            Circle(SKETCH8_R_2, mode=Mode.SUBTRACT)
    extrude(amount=BOSS_EXTRUDE5_2_DEPTH)


with BuildPart() as body_4:
    # Sketch8 → Boss-Extrude5 3 (new body)
    with BuildSketch(Plane(origin=(0, 0, 3), x_dir=(-1, 0, 0), z_dir=(0, 0, -1)).offset(BOSS_EXTRUDE5_START)):
        with Locations((0, 20)):
            Circle(SKETCH8_R)
        with Locations((0, 20)):
            Circle(SKETCH8_R_2, mode=Mode.SUBTRACT)
    extrude(amount=BOSS_EXTRUDE5_3_DEPTH)


solid = Compound([part.part, body_2.part, body_3.part, body_4.part])
